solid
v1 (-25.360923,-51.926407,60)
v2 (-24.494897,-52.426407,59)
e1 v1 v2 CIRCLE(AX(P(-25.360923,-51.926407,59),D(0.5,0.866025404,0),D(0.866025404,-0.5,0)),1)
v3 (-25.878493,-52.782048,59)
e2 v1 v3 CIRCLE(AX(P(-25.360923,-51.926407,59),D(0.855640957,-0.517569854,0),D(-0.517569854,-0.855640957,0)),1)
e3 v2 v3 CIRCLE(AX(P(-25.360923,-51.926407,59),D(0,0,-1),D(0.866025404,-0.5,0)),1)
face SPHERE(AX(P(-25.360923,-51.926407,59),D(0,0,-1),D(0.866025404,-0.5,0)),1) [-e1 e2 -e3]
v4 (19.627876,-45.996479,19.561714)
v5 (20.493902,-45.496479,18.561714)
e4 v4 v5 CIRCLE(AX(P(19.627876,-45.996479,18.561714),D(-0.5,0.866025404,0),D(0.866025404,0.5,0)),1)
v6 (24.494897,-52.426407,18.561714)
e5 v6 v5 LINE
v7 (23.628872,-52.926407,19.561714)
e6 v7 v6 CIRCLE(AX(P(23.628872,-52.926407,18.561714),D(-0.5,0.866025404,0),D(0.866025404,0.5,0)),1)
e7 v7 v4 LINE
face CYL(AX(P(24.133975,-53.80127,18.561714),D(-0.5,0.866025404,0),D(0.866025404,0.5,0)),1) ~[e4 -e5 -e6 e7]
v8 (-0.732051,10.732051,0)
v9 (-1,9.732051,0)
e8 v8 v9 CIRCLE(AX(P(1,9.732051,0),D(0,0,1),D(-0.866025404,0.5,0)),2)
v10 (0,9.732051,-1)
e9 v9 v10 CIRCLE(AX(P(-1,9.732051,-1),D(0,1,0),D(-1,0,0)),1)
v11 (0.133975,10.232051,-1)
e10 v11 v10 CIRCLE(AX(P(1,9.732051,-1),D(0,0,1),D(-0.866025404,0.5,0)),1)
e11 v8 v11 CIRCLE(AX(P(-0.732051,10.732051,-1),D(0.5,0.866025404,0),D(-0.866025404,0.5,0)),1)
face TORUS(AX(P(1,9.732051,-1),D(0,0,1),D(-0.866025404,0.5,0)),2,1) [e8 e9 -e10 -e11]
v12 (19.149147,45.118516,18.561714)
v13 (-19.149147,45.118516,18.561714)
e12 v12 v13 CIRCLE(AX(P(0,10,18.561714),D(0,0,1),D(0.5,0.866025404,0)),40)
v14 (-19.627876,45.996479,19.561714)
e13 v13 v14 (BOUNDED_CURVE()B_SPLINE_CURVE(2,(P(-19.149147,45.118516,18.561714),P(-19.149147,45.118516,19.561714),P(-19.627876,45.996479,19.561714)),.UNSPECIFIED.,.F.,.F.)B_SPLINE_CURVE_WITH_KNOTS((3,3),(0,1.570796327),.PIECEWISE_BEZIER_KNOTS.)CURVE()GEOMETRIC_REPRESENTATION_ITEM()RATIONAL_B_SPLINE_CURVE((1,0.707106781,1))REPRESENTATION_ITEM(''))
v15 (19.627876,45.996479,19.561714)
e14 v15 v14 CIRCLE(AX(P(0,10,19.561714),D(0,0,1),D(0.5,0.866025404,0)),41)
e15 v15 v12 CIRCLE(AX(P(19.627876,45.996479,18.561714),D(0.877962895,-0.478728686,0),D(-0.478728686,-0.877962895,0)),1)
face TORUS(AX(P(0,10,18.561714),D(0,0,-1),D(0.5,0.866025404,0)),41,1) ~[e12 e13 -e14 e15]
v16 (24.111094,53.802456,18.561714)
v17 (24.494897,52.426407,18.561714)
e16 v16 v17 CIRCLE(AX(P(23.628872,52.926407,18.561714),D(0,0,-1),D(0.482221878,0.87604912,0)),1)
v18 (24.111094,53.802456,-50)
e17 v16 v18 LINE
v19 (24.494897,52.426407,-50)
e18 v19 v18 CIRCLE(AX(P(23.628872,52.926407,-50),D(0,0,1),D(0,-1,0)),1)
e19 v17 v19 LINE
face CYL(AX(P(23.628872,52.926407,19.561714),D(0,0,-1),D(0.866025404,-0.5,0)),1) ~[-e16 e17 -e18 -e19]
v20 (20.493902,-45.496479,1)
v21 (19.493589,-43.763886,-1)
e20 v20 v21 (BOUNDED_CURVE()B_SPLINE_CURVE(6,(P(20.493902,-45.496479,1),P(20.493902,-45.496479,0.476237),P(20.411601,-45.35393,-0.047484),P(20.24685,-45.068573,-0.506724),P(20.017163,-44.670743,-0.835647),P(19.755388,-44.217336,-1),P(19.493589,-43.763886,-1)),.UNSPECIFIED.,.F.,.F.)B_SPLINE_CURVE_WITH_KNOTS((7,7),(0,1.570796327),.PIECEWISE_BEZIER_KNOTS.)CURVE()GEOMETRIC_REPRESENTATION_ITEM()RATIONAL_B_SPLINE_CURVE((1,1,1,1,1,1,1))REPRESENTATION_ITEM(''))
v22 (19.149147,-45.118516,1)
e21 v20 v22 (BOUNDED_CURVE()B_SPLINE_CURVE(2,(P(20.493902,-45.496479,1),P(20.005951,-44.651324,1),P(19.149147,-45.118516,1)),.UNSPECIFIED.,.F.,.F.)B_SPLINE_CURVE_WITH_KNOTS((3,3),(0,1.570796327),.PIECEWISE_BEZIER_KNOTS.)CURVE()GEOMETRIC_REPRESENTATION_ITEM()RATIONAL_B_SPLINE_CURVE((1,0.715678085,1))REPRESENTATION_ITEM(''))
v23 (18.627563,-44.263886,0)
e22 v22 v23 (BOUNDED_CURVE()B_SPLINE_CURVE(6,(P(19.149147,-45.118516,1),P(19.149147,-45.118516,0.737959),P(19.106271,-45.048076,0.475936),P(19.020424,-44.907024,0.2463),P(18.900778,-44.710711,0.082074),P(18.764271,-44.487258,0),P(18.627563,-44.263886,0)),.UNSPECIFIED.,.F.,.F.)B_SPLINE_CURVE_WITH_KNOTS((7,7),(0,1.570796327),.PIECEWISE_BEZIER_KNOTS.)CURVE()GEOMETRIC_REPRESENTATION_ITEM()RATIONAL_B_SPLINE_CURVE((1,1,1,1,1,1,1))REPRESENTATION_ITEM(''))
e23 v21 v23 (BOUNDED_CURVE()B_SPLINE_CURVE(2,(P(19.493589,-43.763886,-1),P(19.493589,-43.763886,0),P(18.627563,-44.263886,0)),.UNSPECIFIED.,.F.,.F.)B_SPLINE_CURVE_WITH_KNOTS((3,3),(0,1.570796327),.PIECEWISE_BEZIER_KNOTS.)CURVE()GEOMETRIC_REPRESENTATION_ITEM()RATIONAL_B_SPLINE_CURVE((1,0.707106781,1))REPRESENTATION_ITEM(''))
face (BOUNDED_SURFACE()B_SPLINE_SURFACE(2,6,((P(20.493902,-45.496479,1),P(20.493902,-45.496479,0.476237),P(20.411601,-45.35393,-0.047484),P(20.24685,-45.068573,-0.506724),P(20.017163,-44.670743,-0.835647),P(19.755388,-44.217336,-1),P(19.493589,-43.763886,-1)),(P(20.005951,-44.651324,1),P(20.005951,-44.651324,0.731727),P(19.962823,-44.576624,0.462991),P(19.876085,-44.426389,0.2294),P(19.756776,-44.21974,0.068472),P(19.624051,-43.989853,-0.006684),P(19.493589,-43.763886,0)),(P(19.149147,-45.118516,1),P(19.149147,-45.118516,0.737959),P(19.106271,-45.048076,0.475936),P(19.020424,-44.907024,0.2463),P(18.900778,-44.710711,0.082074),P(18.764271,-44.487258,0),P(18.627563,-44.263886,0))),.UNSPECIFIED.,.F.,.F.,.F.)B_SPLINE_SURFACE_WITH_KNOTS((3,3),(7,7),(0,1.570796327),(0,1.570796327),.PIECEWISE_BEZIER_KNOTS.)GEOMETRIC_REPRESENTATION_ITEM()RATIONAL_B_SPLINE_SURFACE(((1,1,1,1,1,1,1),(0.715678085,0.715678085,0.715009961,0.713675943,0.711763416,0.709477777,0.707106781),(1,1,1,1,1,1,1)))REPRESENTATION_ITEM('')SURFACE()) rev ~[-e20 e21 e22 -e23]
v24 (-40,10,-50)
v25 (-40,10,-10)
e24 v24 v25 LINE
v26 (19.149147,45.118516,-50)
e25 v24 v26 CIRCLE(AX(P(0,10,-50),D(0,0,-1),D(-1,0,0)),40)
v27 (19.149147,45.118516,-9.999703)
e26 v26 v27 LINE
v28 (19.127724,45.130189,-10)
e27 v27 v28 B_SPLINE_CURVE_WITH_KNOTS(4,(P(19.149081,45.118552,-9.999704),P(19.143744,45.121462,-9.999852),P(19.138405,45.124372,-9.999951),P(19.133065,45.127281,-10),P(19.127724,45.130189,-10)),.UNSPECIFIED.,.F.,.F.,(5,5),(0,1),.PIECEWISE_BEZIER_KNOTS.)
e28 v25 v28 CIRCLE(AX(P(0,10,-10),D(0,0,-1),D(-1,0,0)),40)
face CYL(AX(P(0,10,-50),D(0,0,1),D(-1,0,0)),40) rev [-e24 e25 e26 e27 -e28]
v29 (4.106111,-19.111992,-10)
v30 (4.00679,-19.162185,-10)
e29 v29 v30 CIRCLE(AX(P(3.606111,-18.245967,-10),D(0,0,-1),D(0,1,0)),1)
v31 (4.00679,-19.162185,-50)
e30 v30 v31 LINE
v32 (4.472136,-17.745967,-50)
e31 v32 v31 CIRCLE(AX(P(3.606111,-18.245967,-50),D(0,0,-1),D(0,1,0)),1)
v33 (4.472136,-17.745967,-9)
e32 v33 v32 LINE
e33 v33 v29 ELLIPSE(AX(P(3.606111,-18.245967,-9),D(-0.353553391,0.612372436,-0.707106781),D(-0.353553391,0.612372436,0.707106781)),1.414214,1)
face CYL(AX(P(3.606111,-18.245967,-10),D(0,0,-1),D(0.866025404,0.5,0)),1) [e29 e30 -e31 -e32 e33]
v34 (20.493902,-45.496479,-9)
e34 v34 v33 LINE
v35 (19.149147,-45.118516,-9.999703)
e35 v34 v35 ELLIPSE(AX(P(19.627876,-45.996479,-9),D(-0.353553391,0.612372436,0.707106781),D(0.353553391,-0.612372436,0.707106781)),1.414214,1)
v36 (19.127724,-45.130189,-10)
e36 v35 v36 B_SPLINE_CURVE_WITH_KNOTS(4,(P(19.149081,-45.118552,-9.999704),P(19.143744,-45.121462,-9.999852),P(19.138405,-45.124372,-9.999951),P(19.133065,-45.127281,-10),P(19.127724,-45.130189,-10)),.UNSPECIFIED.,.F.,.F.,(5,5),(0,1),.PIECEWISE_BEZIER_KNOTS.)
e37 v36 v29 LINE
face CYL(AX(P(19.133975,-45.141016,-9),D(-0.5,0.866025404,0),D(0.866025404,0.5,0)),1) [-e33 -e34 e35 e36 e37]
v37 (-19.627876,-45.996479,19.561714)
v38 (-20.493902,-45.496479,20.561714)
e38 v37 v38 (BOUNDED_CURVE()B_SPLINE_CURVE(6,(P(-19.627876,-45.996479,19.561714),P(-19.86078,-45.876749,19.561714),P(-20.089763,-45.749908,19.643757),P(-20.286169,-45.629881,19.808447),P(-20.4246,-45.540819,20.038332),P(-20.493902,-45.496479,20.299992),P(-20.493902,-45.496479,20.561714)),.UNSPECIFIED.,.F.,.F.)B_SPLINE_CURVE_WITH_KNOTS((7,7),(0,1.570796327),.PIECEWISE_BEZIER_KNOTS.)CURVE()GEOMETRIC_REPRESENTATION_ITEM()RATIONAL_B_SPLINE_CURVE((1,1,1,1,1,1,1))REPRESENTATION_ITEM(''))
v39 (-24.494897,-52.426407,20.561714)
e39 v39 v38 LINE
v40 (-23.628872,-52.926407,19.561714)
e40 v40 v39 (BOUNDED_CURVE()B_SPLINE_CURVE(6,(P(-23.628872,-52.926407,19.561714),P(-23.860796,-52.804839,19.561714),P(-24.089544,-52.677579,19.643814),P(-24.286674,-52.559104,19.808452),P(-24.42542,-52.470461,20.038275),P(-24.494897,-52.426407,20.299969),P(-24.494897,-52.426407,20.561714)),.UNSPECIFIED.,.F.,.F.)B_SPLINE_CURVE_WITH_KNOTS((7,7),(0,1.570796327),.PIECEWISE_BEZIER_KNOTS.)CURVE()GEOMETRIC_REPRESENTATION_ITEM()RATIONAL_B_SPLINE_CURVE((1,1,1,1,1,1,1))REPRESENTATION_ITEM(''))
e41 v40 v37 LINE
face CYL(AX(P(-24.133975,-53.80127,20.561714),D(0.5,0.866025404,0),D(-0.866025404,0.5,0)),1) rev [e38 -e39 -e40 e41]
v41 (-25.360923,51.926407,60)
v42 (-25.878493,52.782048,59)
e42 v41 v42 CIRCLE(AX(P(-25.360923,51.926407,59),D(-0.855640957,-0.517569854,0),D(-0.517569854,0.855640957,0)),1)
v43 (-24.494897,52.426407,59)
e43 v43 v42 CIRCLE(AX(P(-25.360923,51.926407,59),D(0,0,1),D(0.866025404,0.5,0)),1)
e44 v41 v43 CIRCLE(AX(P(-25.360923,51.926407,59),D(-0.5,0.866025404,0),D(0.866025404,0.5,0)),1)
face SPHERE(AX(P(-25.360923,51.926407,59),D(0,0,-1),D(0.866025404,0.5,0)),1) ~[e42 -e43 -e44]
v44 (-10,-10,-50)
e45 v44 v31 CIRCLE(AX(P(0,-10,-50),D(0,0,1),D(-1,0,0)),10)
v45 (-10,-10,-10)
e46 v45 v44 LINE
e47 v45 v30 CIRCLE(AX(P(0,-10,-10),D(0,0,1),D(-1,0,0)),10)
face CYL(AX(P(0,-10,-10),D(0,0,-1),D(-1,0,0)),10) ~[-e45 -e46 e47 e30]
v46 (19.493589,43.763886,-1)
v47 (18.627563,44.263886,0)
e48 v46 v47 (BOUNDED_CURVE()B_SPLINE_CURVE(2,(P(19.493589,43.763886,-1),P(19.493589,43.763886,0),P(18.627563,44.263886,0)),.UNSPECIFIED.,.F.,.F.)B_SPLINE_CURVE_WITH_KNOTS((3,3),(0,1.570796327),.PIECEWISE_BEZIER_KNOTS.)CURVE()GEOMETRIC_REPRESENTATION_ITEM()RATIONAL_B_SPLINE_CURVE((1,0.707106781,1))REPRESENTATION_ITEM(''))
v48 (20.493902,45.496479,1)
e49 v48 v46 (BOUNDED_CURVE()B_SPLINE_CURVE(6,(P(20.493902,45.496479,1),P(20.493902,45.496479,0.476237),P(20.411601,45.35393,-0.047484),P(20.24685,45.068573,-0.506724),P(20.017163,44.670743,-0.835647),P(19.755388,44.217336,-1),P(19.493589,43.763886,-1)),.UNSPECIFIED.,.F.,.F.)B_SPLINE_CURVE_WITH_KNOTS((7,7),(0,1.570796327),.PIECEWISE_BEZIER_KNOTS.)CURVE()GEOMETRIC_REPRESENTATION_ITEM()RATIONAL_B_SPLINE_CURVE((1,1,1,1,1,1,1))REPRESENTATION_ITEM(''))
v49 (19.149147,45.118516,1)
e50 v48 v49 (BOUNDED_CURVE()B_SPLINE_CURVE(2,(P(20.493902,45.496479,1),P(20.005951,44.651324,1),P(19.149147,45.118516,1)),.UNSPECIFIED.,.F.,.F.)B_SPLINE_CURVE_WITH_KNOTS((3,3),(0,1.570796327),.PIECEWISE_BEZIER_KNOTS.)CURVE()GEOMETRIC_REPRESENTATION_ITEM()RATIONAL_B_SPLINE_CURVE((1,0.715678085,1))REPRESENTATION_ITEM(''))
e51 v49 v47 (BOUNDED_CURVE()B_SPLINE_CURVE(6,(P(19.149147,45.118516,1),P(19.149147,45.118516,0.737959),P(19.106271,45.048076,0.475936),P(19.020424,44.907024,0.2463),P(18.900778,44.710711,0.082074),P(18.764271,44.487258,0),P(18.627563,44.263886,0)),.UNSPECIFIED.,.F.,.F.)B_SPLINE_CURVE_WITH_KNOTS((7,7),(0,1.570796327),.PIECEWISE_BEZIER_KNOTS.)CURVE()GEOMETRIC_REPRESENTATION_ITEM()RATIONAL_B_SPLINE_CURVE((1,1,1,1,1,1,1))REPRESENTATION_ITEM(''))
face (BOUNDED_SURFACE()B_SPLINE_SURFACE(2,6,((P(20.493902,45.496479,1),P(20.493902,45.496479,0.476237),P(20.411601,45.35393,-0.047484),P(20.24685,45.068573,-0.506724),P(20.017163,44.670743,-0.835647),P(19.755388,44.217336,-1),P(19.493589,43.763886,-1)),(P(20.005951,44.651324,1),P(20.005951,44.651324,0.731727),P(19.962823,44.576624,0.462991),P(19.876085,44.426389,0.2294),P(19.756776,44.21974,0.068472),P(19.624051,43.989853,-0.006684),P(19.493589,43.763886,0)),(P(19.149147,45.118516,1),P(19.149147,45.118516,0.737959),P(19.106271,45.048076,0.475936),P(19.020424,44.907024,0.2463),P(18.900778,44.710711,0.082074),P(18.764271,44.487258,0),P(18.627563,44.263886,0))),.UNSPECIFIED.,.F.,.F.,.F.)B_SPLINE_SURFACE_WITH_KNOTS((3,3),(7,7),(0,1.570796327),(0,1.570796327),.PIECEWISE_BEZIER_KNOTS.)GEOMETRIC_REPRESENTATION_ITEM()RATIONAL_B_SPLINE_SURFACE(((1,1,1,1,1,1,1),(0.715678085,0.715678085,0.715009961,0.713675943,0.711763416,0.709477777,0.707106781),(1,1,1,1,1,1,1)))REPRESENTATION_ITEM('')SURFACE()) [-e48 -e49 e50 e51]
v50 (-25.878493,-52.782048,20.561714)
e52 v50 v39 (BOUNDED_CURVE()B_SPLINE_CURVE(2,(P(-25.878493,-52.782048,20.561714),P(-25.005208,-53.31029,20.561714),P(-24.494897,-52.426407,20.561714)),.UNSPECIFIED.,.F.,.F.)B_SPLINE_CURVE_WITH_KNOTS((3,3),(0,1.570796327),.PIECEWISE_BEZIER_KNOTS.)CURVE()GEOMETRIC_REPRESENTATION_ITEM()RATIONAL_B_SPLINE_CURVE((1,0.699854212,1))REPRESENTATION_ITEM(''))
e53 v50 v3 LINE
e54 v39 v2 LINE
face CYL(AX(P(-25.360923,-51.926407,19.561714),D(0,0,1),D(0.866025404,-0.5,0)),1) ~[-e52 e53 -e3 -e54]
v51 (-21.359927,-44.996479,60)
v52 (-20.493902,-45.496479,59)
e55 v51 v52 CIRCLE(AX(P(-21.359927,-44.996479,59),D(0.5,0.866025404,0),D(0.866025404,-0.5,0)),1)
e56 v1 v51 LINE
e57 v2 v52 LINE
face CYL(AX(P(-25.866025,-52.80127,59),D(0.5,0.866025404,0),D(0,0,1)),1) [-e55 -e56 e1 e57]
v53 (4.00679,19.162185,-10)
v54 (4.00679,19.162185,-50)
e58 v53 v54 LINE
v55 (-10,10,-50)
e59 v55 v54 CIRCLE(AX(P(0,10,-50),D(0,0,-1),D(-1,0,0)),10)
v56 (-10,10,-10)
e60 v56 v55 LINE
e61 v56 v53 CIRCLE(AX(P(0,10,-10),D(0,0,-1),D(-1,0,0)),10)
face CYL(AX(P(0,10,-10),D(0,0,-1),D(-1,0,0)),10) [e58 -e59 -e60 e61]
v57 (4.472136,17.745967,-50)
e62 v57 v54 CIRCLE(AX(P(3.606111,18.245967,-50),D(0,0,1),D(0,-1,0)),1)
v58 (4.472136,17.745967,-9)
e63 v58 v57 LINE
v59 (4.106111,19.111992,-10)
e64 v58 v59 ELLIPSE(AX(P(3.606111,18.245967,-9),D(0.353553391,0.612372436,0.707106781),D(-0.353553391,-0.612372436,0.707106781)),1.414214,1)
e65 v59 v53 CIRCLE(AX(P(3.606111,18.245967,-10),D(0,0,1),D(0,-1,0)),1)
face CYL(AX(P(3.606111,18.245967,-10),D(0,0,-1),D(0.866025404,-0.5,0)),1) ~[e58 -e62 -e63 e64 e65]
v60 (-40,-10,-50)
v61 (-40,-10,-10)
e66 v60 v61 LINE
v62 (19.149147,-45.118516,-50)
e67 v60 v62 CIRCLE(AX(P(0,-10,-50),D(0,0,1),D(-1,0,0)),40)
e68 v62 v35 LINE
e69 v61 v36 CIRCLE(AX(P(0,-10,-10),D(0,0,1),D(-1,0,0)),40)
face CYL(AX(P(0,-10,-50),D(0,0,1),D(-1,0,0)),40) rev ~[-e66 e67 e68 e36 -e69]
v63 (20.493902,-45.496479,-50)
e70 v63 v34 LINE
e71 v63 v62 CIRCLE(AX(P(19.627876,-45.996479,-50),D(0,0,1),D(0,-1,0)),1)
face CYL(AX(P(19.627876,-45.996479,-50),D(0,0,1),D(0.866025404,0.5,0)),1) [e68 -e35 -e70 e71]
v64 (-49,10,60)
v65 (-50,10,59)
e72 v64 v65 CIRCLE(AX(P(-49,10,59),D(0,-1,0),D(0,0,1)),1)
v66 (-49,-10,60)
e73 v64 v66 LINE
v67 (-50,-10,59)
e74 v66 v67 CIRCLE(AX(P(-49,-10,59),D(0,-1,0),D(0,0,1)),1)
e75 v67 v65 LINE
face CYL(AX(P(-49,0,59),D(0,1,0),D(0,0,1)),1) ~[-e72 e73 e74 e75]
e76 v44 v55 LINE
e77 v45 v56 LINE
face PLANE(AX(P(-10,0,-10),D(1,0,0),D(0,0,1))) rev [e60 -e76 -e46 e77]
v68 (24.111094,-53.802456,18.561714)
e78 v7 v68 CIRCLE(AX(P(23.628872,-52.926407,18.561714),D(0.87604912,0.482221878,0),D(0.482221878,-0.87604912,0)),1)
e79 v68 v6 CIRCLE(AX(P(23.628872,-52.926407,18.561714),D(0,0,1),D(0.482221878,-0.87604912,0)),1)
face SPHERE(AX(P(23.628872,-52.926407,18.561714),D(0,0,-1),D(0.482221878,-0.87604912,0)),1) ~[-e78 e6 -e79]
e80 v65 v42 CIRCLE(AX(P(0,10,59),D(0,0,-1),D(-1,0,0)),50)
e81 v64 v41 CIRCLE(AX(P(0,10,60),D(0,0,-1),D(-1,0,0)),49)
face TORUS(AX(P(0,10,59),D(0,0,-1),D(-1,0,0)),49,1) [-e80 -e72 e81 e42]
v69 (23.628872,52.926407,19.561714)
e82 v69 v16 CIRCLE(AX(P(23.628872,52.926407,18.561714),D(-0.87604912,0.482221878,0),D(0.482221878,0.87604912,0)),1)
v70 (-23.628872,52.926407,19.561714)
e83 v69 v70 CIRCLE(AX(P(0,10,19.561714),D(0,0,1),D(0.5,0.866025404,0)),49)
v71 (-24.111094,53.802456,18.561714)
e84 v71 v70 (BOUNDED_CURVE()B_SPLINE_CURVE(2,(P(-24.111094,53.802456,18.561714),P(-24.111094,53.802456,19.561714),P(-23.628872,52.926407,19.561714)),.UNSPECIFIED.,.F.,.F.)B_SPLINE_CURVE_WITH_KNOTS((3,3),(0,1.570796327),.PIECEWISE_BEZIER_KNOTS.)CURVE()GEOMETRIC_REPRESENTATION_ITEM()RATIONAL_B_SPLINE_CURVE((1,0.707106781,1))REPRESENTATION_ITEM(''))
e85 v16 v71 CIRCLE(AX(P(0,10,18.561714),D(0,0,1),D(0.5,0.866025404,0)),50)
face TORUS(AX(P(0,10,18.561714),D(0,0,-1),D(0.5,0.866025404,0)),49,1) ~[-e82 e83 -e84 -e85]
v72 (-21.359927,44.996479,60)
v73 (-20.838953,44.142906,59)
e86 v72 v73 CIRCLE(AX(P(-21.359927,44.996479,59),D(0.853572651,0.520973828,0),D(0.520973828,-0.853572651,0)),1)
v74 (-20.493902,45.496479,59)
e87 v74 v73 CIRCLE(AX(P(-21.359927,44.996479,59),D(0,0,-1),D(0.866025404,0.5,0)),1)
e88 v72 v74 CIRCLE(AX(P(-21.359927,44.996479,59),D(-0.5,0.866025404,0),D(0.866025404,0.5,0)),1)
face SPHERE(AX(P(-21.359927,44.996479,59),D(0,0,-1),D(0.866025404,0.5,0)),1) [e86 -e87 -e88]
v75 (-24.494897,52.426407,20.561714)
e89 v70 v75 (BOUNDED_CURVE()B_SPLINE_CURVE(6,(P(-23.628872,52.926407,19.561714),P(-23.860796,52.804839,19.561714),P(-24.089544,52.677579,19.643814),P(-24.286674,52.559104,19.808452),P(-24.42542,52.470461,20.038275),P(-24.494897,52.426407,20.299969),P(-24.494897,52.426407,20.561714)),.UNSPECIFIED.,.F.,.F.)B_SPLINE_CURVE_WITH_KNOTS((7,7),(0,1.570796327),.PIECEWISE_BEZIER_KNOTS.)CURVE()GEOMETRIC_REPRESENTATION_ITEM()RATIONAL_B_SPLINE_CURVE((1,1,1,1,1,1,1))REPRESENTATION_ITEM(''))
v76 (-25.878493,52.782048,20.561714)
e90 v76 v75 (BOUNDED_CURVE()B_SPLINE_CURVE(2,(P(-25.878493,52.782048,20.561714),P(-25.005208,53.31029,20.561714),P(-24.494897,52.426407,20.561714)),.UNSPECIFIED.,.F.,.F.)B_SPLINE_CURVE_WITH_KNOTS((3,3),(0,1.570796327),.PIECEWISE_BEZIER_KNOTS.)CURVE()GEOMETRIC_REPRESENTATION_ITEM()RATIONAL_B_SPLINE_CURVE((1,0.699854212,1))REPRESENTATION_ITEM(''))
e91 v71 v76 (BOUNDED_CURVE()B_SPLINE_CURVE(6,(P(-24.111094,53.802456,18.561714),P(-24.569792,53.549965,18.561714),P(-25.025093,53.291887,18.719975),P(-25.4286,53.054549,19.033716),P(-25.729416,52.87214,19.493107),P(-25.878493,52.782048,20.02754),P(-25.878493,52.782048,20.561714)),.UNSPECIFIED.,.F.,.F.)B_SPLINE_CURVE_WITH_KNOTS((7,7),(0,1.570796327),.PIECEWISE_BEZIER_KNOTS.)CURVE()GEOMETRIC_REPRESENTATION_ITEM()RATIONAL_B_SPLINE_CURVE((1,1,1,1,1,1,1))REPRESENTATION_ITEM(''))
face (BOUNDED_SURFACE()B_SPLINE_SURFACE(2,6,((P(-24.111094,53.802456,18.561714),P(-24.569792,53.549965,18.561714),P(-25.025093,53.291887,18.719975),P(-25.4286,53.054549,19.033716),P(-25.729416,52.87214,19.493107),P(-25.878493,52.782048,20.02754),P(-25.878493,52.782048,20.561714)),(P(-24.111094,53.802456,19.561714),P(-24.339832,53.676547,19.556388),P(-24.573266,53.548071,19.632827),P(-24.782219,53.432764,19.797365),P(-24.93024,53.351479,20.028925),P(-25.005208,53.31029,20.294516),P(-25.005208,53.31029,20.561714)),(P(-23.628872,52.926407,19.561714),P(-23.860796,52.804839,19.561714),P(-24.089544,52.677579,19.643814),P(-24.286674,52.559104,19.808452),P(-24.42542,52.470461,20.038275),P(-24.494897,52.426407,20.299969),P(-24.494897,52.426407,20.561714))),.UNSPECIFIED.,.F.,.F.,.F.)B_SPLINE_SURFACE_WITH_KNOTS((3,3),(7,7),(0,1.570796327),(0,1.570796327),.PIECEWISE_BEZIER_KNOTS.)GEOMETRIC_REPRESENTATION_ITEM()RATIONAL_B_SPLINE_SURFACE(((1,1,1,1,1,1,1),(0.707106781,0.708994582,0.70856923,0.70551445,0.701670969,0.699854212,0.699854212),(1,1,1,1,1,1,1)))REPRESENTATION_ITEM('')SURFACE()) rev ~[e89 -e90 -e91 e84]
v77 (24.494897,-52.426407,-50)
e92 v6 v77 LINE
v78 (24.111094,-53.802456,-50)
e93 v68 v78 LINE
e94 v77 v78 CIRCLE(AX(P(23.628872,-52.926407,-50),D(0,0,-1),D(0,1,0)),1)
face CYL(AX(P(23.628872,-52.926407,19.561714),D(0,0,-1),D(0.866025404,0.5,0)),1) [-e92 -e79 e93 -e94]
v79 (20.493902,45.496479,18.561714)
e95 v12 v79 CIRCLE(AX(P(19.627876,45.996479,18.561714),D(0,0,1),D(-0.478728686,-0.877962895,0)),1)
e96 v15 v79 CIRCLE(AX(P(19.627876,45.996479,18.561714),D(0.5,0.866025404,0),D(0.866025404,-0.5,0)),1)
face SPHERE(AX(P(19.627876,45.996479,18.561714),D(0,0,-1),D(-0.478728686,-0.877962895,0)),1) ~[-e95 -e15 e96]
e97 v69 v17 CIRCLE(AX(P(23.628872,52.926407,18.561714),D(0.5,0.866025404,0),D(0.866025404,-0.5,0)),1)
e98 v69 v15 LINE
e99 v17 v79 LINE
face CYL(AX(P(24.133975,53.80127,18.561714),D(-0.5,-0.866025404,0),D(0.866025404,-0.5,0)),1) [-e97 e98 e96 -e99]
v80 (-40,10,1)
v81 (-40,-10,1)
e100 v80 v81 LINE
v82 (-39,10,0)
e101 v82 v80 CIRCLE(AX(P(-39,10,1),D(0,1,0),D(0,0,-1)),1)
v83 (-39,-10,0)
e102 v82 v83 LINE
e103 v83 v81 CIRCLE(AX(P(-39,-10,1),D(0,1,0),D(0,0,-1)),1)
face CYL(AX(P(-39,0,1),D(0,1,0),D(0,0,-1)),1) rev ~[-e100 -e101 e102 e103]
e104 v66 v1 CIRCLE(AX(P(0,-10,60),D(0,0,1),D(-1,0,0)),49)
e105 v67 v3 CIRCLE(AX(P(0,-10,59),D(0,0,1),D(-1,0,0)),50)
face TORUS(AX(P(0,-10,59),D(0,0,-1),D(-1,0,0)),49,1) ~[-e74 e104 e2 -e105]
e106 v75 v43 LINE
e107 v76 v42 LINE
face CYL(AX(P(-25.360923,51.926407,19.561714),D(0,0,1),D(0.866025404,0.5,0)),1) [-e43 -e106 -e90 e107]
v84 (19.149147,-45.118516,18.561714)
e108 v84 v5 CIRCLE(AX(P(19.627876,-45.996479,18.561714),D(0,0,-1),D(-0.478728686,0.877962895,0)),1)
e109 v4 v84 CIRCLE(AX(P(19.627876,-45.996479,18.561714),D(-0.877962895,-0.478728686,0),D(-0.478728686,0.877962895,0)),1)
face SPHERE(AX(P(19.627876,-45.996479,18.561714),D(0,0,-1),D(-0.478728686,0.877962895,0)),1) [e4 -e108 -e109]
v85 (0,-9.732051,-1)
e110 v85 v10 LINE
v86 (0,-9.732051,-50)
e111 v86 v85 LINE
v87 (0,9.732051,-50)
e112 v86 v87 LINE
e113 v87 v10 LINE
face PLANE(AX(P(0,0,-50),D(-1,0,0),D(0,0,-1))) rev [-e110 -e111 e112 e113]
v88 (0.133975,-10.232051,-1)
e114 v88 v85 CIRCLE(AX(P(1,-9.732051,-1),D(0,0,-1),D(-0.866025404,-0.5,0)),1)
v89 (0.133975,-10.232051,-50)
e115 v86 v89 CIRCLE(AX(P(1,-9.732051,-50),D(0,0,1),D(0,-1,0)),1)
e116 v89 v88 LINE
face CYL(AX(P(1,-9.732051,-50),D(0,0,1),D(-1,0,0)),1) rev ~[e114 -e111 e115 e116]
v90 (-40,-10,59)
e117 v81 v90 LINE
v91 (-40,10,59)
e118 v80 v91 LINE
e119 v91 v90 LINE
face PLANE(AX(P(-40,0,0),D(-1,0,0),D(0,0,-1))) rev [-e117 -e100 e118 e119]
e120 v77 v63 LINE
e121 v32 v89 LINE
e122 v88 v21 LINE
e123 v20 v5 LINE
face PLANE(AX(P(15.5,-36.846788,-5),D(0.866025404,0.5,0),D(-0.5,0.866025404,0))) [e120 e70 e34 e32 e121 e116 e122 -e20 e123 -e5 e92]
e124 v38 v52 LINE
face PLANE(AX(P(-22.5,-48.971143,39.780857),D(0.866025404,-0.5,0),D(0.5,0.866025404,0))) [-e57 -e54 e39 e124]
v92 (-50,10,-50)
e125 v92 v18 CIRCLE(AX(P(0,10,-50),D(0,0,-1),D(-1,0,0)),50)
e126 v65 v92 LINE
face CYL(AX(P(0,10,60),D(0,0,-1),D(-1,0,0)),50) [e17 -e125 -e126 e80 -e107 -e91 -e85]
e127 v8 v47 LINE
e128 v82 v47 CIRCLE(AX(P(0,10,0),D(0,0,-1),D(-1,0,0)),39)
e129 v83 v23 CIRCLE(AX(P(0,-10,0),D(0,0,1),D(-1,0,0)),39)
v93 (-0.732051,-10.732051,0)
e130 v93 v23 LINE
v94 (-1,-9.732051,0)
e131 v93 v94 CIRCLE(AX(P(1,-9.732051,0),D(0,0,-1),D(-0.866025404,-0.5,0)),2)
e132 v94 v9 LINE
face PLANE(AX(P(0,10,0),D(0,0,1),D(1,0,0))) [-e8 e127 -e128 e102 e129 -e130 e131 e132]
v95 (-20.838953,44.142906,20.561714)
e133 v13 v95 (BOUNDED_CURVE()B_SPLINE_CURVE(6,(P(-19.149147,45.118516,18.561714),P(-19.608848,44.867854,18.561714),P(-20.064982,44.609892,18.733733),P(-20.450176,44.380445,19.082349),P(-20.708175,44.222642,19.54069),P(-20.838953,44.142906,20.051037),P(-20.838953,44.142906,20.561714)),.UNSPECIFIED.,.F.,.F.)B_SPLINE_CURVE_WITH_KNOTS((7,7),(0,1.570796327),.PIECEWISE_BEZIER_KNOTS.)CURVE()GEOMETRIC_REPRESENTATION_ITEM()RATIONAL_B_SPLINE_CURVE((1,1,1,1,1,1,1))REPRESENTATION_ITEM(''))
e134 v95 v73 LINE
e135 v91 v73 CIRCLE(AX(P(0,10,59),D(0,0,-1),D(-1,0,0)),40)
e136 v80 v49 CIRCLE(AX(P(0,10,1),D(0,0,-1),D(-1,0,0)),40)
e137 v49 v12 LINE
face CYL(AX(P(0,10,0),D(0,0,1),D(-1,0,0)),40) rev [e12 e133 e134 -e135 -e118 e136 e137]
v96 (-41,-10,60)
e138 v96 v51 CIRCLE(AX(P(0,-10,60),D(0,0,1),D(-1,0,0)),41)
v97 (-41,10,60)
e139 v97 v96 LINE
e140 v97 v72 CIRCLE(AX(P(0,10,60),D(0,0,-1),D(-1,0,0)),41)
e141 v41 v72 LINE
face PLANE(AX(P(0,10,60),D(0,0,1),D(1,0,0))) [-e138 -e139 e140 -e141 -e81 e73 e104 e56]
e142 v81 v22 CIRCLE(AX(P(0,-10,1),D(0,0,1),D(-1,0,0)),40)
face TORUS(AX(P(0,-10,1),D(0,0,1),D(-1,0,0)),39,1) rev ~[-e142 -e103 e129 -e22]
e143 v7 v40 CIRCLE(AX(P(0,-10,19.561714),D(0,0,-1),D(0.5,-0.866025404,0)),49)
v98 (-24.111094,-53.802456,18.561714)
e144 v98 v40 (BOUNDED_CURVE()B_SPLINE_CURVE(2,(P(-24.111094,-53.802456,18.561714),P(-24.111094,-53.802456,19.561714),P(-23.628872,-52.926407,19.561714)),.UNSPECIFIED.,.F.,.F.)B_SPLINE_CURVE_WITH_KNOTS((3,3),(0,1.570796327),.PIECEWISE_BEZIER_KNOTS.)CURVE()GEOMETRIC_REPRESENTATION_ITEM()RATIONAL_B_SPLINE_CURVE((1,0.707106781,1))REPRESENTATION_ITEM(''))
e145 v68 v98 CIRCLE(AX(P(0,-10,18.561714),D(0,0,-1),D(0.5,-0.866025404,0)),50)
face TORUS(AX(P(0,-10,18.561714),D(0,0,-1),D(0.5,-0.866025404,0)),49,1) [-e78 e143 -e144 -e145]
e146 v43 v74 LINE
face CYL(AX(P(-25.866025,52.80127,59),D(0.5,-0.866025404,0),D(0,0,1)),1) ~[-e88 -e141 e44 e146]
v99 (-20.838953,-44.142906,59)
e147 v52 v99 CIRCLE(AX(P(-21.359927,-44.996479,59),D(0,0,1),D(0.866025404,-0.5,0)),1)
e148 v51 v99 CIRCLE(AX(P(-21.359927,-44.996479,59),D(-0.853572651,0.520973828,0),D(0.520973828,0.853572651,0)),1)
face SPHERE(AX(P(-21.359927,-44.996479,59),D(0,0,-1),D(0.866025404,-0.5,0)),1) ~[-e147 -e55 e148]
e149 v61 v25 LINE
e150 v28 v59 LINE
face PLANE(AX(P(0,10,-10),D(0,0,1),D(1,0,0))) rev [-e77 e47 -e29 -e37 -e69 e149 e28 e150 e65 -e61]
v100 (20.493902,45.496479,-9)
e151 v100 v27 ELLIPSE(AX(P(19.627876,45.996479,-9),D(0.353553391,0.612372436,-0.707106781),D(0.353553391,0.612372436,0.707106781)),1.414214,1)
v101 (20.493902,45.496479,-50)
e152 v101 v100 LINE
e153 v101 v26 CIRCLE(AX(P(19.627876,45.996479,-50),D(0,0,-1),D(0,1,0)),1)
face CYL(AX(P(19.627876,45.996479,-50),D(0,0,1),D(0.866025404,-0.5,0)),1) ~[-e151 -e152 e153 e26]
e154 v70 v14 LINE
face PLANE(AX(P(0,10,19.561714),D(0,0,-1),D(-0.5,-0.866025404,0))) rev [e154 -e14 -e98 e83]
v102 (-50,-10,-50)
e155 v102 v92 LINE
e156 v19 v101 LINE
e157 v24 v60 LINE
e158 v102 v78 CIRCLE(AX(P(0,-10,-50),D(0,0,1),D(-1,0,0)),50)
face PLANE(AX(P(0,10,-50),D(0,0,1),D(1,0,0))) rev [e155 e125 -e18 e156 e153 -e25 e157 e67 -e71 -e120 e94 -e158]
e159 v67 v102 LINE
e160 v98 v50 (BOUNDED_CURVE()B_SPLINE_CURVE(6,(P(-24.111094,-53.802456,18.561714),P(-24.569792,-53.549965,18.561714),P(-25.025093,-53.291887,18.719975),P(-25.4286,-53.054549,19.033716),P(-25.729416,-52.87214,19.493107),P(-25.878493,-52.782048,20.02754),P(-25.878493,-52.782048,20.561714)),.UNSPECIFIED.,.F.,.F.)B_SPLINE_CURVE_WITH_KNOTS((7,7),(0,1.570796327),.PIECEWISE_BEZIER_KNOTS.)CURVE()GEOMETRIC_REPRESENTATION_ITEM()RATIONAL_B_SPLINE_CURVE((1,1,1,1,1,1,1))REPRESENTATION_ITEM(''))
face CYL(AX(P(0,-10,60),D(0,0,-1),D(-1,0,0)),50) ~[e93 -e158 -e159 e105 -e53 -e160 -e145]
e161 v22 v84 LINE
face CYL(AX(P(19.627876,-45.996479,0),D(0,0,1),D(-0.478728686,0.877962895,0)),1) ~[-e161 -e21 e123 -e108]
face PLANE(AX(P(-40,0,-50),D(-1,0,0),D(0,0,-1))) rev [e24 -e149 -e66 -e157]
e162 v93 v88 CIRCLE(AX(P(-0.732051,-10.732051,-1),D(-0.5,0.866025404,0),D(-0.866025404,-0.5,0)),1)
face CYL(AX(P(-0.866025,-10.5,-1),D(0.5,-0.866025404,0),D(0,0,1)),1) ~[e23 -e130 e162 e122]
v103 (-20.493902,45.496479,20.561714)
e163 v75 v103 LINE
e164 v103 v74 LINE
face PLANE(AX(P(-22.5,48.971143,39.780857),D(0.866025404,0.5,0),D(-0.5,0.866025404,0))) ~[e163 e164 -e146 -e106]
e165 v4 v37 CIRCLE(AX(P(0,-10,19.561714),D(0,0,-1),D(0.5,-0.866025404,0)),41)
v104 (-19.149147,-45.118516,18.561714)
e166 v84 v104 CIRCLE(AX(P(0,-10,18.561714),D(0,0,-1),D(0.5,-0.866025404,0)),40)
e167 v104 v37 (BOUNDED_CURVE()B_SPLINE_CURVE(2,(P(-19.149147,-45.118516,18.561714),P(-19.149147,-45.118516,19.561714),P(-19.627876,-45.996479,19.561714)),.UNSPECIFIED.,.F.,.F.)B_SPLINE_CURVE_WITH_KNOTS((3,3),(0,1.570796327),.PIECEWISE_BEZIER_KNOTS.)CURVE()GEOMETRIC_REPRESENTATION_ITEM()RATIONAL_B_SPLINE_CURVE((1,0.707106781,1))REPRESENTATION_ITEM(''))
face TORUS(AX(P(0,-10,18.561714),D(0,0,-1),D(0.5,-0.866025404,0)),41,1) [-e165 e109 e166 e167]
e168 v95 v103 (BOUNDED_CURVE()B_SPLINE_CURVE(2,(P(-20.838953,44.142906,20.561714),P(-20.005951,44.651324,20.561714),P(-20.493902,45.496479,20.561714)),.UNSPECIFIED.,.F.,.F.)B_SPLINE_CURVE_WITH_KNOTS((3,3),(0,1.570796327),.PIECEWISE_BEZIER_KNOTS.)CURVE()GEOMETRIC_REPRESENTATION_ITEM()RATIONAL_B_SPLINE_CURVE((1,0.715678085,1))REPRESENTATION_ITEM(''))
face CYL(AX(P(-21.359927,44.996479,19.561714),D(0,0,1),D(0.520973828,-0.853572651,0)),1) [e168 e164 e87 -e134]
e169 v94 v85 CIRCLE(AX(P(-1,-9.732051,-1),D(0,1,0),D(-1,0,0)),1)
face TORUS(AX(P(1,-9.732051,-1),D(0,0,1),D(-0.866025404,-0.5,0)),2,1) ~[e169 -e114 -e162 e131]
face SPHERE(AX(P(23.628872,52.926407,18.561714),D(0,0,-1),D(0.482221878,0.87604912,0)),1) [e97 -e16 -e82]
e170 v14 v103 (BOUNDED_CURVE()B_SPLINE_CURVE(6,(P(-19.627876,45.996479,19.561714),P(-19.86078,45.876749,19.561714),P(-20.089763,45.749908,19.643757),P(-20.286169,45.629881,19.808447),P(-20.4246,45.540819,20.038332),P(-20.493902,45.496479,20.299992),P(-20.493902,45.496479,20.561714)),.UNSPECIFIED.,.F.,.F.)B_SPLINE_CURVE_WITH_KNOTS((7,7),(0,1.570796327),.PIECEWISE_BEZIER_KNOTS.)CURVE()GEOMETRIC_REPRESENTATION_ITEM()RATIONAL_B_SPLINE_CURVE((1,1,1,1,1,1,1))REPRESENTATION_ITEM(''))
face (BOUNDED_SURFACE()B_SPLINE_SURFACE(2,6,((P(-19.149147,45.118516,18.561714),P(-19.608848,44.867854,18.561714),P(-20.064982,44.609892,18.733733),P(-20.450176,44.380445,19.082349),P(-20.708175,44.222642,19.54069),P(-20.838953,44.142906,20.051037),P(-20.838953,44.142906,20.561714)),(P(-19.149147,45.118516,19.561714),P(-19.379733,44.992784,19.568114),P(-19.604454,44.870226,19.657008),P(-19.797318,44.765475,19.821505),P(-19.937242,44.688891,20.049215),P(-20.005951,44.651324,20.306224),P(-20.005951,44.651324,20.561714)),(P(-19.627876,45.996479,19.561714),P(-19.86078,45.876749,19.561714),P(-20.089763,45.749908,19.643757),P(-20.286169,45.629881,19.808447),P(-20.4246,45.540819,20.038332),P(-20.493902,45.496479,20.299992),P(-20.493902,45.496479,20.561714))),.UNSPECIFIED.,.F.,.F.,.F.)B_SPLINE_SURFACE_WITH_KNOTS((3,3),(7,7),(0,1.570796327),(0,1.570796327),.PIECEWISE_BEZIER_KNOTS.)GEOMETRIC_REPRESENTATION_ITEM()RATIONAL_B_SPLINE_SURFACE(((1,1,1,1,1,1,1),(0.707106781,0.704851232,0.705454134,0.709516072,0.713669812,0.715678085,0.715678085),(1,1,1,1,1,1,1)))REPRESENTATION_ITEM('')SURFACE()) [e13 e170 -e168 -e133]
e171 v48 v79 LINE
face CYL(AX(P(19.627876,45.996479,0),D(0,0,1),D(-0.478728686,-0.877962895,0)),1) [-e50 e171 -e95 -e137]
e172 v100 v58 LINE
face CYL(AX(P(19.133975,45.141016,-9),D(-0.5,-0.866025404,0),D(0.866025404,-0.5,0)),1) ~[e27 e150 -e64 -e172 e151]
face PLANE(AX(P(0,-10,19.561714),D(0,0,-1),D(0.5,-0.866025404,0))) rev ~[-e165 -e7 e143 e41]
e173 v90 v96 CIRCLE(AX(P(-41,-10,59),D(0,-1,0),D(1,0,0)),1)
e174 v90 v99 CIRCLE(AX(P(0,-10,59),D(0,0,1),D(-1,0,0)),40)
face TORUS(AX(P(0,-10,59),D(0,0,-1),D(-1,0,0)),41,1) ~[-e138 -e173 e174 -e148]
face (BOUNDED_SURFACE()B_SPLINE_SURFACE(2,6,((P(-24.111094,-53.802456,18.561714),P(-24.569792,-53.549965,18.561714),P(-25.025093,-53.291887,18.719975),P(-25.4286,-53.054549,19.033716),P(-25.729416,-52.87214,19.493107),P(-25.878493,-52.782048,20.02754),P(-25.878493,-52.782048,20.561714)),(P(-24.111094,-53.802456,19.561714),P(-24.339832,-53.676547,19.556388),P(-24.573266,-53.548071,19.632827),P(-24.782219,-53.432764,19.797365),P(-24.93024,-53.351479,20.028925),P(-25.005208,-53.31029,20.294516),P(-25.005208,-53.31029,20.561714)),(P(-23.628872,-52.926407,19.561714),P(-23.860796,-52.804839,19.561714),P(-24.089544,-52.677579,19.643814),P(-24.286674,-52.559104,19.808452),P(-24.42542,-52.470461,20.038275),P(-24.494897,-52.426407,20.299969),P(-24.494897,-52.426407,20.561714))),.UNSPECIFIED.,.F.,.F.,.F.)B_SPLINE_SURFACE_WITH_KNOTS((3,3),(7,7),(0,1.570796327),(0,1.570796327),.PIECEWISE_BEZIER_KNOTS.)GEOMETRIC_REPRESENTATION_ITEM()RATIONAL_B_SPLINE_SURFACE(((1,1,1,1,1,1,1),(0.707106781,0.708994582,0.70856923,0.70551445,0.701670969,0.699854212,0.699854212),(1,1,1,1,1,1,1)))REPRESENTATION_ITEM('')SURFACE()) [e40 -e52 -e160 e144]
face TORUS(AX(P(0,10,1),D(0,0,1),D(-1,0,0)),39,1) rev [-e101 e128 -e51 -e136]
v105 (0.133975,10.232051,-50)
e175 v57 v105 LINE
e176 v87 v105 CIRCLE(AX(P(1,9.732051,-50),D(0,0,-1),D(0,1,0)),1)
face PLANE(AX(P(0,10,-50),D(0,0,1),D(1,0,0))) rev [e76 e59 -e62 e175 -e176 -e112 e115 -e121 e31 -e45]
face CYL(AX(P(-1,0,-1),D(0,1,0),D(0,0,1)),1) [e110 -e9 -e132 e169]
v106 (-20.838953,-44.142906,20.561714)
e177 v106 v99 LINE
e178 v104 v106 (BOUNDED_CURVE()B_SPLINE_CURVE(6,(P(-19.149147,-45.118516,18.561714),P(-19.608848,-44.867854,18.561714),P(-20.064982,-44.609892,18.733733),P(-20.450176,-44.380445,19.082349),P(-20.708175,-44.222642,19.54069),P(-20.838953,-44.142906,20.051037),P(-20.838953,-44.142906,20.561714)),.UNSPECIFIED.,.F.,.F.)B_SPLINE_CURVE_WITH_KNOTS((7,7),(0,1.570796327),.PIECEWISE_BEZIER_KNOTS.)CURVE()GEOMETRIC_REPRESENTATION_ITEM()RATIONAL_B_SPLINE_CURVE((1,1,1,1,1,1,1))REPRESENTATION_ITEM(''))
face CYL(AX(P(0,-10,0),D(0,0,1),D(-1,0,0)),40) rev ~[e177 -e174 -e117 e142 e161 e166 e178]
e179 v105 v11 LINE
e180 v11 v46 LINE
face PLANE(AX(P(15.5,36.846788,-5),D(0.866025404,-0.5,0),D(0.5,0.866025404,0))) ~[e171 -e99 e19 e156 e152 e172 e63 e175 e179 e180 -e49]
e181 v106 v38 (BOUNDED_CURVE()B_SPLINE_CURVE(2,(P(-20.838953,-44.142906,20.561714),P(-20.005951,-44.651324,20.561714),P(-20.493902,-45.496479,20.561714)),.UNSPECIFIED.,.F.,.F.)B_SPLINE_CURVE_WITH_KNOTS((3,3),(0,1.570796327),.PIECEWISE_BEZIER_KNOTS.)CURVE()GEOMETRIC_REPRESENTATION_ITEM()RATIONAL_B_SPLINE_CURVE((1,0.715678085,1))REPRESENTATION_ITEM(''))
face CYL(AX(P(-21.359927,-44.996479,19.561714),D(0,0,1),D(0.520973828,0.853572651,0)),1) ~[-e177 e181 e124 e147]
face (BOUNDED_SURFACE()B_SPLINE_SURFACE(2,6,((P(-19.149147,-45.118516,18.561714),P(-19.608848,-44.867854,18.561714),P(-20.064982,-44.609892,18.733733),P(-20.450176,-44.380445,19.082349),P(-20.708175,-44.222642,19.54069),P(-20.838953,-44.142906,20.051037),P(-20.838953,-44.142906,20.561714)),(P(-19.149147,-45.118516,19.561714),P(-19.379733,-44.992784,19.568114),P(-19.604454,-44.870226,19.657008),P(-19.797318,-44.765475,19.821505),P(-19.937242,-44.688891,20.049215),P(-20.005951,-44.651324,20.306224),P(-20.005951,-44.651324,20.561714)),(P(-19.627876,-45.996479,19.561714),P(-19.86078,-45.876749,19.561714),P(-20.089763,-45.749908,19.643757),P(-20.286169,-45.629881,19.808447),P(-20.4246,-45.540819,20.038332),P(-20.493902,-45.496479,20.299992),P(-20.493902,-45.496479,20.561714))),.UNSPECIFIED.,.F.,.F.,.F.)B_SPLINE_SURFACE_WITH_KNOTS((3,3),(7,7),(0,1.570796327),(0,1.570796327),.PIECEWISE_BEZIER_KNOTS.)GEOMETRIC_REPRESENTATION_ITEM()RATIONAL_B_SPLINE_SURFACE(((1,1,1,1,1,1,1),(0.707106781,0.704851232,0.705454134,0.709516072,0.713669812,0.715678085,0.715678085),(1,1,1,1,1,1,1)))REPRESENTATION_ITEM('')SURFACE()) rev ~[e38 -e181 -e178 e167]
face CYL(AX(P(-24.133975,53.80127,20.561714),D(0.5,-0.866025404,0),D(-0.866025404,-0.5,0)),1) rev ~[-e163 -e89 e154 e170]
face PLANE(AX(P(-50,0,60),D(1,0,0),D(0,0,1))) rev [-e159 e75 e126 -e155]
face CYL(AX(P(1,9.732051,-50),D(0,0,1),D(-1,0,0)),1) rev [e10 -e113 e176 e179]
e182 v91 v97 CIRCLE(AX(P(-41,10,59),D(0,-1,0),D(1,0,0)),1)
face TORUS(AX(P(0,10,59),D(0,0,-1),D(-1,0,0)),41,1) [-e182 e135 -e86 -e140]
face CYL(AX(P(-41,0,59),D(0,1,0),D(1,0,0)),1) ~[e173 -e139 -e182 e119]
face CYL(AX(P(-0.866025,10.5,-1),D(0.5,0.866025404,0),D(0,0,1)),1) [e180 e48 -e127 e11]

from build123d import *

# Parameters (mm, degrees)
F1_DEPTH = 10
F2_ANGLE = 120
F3_W     = 10
F3_H     = 40.4382864386
F4_ANGLE = 60
F5_R     = 1


with BuildPart() as f1:
    # F0 (on Front) → F1 (new body)
    with BuildSketch(Plane.XZ):
        Polygon((0, -50), (0, 0), (-40, 0), (-40, 60), (-50, 60), (-50, -50), (-40, -50), (-40, -10), (-10, -10), (-10, -50), align=None)
    extrude(amount=F1_DEPTH)

    # F1_face (on face) → F2 (revolve)
    with BuildSketch(Plane(origin=(-31.3157894737, -10, -4.4736842105), x_dir=(1, 0, 0), z_dir=(0, -1, 0))):
        Polygon((31.3157894737, -45.5263157895), (31.3157894737, 4.4736842105), (-8.6842105263, 4.4736842105), (-8.6842105263, 64.4736842105), (-18.6842105263, 64.4736842105), (-18.6842105263, -45.5263157895), (-8.6842105263, -45.5263157895), (-8.6842105263, -5.5263157895), (21.3157894737, -5.5263157895), (21.3157894737, -45.5263157895), align=None)
    revolve(axis=Axis((0, -10, -25), (0, 0, 1)), revolution_arc=F2_ANGLE)

    # F3 (on face) → F4 (revolve, cut)
    with BuildSketch(Plane(origin=(-4.3301270189, -2.5, 0), x_dir=(-0.5, 0.8660254038, 0), z_dir=(0.8660254038, 0.5, 0))):
        with Locations((-53.6602540378, 39.7808567807)):
            Rectangle(F3_W, F3_H)
    revolve(axis=Axis((0, -10, -25), (0, 0, -1)), revolution_arc=F4_ANGLE, mode=Mode.SUBTRACT)

    # F5
    f5_edges = [f1.edges().sort_by_distance(p)[0] for p in [
        (-34.641016, -30, 60),
        (-40, -5, 60),
        (-50, -5, 60),
        (-43.30127, -35, 60),
        (-25, -53.30127, 39.780857),
        (-20, -44.641016, 39.780857),
        (-22.5, -48.971143, 60),
        (-22.5, -48.971143, 19.561714),
        (0, -50, 19.561714),
        (0, -60, 19.561714),
        (22.5, -48.971143, 19.561714),
        (10, -27.320508, 0),
        (-20, -44.641016, 0),
        (-40, -10, 30),
        (-40, -5, 0),
        (0, -5, 0),
        (25, -53.30127, -15.219143),
        (20, -44.641016, 9.780857),
        (20, -44.641016, -30),
        (12.5, -31.650635, -10),
        (5, -18.660254, -30),
        (0, -10, -25),
    ]]
    fillet(f5_edges, radius=F5_R)

    # F6: F1 across plane


with BuildPart() as f1_1:
    add(f1.part)
    add(f1.part.mirror(Plane.XZ))


solid = f1_1.part
